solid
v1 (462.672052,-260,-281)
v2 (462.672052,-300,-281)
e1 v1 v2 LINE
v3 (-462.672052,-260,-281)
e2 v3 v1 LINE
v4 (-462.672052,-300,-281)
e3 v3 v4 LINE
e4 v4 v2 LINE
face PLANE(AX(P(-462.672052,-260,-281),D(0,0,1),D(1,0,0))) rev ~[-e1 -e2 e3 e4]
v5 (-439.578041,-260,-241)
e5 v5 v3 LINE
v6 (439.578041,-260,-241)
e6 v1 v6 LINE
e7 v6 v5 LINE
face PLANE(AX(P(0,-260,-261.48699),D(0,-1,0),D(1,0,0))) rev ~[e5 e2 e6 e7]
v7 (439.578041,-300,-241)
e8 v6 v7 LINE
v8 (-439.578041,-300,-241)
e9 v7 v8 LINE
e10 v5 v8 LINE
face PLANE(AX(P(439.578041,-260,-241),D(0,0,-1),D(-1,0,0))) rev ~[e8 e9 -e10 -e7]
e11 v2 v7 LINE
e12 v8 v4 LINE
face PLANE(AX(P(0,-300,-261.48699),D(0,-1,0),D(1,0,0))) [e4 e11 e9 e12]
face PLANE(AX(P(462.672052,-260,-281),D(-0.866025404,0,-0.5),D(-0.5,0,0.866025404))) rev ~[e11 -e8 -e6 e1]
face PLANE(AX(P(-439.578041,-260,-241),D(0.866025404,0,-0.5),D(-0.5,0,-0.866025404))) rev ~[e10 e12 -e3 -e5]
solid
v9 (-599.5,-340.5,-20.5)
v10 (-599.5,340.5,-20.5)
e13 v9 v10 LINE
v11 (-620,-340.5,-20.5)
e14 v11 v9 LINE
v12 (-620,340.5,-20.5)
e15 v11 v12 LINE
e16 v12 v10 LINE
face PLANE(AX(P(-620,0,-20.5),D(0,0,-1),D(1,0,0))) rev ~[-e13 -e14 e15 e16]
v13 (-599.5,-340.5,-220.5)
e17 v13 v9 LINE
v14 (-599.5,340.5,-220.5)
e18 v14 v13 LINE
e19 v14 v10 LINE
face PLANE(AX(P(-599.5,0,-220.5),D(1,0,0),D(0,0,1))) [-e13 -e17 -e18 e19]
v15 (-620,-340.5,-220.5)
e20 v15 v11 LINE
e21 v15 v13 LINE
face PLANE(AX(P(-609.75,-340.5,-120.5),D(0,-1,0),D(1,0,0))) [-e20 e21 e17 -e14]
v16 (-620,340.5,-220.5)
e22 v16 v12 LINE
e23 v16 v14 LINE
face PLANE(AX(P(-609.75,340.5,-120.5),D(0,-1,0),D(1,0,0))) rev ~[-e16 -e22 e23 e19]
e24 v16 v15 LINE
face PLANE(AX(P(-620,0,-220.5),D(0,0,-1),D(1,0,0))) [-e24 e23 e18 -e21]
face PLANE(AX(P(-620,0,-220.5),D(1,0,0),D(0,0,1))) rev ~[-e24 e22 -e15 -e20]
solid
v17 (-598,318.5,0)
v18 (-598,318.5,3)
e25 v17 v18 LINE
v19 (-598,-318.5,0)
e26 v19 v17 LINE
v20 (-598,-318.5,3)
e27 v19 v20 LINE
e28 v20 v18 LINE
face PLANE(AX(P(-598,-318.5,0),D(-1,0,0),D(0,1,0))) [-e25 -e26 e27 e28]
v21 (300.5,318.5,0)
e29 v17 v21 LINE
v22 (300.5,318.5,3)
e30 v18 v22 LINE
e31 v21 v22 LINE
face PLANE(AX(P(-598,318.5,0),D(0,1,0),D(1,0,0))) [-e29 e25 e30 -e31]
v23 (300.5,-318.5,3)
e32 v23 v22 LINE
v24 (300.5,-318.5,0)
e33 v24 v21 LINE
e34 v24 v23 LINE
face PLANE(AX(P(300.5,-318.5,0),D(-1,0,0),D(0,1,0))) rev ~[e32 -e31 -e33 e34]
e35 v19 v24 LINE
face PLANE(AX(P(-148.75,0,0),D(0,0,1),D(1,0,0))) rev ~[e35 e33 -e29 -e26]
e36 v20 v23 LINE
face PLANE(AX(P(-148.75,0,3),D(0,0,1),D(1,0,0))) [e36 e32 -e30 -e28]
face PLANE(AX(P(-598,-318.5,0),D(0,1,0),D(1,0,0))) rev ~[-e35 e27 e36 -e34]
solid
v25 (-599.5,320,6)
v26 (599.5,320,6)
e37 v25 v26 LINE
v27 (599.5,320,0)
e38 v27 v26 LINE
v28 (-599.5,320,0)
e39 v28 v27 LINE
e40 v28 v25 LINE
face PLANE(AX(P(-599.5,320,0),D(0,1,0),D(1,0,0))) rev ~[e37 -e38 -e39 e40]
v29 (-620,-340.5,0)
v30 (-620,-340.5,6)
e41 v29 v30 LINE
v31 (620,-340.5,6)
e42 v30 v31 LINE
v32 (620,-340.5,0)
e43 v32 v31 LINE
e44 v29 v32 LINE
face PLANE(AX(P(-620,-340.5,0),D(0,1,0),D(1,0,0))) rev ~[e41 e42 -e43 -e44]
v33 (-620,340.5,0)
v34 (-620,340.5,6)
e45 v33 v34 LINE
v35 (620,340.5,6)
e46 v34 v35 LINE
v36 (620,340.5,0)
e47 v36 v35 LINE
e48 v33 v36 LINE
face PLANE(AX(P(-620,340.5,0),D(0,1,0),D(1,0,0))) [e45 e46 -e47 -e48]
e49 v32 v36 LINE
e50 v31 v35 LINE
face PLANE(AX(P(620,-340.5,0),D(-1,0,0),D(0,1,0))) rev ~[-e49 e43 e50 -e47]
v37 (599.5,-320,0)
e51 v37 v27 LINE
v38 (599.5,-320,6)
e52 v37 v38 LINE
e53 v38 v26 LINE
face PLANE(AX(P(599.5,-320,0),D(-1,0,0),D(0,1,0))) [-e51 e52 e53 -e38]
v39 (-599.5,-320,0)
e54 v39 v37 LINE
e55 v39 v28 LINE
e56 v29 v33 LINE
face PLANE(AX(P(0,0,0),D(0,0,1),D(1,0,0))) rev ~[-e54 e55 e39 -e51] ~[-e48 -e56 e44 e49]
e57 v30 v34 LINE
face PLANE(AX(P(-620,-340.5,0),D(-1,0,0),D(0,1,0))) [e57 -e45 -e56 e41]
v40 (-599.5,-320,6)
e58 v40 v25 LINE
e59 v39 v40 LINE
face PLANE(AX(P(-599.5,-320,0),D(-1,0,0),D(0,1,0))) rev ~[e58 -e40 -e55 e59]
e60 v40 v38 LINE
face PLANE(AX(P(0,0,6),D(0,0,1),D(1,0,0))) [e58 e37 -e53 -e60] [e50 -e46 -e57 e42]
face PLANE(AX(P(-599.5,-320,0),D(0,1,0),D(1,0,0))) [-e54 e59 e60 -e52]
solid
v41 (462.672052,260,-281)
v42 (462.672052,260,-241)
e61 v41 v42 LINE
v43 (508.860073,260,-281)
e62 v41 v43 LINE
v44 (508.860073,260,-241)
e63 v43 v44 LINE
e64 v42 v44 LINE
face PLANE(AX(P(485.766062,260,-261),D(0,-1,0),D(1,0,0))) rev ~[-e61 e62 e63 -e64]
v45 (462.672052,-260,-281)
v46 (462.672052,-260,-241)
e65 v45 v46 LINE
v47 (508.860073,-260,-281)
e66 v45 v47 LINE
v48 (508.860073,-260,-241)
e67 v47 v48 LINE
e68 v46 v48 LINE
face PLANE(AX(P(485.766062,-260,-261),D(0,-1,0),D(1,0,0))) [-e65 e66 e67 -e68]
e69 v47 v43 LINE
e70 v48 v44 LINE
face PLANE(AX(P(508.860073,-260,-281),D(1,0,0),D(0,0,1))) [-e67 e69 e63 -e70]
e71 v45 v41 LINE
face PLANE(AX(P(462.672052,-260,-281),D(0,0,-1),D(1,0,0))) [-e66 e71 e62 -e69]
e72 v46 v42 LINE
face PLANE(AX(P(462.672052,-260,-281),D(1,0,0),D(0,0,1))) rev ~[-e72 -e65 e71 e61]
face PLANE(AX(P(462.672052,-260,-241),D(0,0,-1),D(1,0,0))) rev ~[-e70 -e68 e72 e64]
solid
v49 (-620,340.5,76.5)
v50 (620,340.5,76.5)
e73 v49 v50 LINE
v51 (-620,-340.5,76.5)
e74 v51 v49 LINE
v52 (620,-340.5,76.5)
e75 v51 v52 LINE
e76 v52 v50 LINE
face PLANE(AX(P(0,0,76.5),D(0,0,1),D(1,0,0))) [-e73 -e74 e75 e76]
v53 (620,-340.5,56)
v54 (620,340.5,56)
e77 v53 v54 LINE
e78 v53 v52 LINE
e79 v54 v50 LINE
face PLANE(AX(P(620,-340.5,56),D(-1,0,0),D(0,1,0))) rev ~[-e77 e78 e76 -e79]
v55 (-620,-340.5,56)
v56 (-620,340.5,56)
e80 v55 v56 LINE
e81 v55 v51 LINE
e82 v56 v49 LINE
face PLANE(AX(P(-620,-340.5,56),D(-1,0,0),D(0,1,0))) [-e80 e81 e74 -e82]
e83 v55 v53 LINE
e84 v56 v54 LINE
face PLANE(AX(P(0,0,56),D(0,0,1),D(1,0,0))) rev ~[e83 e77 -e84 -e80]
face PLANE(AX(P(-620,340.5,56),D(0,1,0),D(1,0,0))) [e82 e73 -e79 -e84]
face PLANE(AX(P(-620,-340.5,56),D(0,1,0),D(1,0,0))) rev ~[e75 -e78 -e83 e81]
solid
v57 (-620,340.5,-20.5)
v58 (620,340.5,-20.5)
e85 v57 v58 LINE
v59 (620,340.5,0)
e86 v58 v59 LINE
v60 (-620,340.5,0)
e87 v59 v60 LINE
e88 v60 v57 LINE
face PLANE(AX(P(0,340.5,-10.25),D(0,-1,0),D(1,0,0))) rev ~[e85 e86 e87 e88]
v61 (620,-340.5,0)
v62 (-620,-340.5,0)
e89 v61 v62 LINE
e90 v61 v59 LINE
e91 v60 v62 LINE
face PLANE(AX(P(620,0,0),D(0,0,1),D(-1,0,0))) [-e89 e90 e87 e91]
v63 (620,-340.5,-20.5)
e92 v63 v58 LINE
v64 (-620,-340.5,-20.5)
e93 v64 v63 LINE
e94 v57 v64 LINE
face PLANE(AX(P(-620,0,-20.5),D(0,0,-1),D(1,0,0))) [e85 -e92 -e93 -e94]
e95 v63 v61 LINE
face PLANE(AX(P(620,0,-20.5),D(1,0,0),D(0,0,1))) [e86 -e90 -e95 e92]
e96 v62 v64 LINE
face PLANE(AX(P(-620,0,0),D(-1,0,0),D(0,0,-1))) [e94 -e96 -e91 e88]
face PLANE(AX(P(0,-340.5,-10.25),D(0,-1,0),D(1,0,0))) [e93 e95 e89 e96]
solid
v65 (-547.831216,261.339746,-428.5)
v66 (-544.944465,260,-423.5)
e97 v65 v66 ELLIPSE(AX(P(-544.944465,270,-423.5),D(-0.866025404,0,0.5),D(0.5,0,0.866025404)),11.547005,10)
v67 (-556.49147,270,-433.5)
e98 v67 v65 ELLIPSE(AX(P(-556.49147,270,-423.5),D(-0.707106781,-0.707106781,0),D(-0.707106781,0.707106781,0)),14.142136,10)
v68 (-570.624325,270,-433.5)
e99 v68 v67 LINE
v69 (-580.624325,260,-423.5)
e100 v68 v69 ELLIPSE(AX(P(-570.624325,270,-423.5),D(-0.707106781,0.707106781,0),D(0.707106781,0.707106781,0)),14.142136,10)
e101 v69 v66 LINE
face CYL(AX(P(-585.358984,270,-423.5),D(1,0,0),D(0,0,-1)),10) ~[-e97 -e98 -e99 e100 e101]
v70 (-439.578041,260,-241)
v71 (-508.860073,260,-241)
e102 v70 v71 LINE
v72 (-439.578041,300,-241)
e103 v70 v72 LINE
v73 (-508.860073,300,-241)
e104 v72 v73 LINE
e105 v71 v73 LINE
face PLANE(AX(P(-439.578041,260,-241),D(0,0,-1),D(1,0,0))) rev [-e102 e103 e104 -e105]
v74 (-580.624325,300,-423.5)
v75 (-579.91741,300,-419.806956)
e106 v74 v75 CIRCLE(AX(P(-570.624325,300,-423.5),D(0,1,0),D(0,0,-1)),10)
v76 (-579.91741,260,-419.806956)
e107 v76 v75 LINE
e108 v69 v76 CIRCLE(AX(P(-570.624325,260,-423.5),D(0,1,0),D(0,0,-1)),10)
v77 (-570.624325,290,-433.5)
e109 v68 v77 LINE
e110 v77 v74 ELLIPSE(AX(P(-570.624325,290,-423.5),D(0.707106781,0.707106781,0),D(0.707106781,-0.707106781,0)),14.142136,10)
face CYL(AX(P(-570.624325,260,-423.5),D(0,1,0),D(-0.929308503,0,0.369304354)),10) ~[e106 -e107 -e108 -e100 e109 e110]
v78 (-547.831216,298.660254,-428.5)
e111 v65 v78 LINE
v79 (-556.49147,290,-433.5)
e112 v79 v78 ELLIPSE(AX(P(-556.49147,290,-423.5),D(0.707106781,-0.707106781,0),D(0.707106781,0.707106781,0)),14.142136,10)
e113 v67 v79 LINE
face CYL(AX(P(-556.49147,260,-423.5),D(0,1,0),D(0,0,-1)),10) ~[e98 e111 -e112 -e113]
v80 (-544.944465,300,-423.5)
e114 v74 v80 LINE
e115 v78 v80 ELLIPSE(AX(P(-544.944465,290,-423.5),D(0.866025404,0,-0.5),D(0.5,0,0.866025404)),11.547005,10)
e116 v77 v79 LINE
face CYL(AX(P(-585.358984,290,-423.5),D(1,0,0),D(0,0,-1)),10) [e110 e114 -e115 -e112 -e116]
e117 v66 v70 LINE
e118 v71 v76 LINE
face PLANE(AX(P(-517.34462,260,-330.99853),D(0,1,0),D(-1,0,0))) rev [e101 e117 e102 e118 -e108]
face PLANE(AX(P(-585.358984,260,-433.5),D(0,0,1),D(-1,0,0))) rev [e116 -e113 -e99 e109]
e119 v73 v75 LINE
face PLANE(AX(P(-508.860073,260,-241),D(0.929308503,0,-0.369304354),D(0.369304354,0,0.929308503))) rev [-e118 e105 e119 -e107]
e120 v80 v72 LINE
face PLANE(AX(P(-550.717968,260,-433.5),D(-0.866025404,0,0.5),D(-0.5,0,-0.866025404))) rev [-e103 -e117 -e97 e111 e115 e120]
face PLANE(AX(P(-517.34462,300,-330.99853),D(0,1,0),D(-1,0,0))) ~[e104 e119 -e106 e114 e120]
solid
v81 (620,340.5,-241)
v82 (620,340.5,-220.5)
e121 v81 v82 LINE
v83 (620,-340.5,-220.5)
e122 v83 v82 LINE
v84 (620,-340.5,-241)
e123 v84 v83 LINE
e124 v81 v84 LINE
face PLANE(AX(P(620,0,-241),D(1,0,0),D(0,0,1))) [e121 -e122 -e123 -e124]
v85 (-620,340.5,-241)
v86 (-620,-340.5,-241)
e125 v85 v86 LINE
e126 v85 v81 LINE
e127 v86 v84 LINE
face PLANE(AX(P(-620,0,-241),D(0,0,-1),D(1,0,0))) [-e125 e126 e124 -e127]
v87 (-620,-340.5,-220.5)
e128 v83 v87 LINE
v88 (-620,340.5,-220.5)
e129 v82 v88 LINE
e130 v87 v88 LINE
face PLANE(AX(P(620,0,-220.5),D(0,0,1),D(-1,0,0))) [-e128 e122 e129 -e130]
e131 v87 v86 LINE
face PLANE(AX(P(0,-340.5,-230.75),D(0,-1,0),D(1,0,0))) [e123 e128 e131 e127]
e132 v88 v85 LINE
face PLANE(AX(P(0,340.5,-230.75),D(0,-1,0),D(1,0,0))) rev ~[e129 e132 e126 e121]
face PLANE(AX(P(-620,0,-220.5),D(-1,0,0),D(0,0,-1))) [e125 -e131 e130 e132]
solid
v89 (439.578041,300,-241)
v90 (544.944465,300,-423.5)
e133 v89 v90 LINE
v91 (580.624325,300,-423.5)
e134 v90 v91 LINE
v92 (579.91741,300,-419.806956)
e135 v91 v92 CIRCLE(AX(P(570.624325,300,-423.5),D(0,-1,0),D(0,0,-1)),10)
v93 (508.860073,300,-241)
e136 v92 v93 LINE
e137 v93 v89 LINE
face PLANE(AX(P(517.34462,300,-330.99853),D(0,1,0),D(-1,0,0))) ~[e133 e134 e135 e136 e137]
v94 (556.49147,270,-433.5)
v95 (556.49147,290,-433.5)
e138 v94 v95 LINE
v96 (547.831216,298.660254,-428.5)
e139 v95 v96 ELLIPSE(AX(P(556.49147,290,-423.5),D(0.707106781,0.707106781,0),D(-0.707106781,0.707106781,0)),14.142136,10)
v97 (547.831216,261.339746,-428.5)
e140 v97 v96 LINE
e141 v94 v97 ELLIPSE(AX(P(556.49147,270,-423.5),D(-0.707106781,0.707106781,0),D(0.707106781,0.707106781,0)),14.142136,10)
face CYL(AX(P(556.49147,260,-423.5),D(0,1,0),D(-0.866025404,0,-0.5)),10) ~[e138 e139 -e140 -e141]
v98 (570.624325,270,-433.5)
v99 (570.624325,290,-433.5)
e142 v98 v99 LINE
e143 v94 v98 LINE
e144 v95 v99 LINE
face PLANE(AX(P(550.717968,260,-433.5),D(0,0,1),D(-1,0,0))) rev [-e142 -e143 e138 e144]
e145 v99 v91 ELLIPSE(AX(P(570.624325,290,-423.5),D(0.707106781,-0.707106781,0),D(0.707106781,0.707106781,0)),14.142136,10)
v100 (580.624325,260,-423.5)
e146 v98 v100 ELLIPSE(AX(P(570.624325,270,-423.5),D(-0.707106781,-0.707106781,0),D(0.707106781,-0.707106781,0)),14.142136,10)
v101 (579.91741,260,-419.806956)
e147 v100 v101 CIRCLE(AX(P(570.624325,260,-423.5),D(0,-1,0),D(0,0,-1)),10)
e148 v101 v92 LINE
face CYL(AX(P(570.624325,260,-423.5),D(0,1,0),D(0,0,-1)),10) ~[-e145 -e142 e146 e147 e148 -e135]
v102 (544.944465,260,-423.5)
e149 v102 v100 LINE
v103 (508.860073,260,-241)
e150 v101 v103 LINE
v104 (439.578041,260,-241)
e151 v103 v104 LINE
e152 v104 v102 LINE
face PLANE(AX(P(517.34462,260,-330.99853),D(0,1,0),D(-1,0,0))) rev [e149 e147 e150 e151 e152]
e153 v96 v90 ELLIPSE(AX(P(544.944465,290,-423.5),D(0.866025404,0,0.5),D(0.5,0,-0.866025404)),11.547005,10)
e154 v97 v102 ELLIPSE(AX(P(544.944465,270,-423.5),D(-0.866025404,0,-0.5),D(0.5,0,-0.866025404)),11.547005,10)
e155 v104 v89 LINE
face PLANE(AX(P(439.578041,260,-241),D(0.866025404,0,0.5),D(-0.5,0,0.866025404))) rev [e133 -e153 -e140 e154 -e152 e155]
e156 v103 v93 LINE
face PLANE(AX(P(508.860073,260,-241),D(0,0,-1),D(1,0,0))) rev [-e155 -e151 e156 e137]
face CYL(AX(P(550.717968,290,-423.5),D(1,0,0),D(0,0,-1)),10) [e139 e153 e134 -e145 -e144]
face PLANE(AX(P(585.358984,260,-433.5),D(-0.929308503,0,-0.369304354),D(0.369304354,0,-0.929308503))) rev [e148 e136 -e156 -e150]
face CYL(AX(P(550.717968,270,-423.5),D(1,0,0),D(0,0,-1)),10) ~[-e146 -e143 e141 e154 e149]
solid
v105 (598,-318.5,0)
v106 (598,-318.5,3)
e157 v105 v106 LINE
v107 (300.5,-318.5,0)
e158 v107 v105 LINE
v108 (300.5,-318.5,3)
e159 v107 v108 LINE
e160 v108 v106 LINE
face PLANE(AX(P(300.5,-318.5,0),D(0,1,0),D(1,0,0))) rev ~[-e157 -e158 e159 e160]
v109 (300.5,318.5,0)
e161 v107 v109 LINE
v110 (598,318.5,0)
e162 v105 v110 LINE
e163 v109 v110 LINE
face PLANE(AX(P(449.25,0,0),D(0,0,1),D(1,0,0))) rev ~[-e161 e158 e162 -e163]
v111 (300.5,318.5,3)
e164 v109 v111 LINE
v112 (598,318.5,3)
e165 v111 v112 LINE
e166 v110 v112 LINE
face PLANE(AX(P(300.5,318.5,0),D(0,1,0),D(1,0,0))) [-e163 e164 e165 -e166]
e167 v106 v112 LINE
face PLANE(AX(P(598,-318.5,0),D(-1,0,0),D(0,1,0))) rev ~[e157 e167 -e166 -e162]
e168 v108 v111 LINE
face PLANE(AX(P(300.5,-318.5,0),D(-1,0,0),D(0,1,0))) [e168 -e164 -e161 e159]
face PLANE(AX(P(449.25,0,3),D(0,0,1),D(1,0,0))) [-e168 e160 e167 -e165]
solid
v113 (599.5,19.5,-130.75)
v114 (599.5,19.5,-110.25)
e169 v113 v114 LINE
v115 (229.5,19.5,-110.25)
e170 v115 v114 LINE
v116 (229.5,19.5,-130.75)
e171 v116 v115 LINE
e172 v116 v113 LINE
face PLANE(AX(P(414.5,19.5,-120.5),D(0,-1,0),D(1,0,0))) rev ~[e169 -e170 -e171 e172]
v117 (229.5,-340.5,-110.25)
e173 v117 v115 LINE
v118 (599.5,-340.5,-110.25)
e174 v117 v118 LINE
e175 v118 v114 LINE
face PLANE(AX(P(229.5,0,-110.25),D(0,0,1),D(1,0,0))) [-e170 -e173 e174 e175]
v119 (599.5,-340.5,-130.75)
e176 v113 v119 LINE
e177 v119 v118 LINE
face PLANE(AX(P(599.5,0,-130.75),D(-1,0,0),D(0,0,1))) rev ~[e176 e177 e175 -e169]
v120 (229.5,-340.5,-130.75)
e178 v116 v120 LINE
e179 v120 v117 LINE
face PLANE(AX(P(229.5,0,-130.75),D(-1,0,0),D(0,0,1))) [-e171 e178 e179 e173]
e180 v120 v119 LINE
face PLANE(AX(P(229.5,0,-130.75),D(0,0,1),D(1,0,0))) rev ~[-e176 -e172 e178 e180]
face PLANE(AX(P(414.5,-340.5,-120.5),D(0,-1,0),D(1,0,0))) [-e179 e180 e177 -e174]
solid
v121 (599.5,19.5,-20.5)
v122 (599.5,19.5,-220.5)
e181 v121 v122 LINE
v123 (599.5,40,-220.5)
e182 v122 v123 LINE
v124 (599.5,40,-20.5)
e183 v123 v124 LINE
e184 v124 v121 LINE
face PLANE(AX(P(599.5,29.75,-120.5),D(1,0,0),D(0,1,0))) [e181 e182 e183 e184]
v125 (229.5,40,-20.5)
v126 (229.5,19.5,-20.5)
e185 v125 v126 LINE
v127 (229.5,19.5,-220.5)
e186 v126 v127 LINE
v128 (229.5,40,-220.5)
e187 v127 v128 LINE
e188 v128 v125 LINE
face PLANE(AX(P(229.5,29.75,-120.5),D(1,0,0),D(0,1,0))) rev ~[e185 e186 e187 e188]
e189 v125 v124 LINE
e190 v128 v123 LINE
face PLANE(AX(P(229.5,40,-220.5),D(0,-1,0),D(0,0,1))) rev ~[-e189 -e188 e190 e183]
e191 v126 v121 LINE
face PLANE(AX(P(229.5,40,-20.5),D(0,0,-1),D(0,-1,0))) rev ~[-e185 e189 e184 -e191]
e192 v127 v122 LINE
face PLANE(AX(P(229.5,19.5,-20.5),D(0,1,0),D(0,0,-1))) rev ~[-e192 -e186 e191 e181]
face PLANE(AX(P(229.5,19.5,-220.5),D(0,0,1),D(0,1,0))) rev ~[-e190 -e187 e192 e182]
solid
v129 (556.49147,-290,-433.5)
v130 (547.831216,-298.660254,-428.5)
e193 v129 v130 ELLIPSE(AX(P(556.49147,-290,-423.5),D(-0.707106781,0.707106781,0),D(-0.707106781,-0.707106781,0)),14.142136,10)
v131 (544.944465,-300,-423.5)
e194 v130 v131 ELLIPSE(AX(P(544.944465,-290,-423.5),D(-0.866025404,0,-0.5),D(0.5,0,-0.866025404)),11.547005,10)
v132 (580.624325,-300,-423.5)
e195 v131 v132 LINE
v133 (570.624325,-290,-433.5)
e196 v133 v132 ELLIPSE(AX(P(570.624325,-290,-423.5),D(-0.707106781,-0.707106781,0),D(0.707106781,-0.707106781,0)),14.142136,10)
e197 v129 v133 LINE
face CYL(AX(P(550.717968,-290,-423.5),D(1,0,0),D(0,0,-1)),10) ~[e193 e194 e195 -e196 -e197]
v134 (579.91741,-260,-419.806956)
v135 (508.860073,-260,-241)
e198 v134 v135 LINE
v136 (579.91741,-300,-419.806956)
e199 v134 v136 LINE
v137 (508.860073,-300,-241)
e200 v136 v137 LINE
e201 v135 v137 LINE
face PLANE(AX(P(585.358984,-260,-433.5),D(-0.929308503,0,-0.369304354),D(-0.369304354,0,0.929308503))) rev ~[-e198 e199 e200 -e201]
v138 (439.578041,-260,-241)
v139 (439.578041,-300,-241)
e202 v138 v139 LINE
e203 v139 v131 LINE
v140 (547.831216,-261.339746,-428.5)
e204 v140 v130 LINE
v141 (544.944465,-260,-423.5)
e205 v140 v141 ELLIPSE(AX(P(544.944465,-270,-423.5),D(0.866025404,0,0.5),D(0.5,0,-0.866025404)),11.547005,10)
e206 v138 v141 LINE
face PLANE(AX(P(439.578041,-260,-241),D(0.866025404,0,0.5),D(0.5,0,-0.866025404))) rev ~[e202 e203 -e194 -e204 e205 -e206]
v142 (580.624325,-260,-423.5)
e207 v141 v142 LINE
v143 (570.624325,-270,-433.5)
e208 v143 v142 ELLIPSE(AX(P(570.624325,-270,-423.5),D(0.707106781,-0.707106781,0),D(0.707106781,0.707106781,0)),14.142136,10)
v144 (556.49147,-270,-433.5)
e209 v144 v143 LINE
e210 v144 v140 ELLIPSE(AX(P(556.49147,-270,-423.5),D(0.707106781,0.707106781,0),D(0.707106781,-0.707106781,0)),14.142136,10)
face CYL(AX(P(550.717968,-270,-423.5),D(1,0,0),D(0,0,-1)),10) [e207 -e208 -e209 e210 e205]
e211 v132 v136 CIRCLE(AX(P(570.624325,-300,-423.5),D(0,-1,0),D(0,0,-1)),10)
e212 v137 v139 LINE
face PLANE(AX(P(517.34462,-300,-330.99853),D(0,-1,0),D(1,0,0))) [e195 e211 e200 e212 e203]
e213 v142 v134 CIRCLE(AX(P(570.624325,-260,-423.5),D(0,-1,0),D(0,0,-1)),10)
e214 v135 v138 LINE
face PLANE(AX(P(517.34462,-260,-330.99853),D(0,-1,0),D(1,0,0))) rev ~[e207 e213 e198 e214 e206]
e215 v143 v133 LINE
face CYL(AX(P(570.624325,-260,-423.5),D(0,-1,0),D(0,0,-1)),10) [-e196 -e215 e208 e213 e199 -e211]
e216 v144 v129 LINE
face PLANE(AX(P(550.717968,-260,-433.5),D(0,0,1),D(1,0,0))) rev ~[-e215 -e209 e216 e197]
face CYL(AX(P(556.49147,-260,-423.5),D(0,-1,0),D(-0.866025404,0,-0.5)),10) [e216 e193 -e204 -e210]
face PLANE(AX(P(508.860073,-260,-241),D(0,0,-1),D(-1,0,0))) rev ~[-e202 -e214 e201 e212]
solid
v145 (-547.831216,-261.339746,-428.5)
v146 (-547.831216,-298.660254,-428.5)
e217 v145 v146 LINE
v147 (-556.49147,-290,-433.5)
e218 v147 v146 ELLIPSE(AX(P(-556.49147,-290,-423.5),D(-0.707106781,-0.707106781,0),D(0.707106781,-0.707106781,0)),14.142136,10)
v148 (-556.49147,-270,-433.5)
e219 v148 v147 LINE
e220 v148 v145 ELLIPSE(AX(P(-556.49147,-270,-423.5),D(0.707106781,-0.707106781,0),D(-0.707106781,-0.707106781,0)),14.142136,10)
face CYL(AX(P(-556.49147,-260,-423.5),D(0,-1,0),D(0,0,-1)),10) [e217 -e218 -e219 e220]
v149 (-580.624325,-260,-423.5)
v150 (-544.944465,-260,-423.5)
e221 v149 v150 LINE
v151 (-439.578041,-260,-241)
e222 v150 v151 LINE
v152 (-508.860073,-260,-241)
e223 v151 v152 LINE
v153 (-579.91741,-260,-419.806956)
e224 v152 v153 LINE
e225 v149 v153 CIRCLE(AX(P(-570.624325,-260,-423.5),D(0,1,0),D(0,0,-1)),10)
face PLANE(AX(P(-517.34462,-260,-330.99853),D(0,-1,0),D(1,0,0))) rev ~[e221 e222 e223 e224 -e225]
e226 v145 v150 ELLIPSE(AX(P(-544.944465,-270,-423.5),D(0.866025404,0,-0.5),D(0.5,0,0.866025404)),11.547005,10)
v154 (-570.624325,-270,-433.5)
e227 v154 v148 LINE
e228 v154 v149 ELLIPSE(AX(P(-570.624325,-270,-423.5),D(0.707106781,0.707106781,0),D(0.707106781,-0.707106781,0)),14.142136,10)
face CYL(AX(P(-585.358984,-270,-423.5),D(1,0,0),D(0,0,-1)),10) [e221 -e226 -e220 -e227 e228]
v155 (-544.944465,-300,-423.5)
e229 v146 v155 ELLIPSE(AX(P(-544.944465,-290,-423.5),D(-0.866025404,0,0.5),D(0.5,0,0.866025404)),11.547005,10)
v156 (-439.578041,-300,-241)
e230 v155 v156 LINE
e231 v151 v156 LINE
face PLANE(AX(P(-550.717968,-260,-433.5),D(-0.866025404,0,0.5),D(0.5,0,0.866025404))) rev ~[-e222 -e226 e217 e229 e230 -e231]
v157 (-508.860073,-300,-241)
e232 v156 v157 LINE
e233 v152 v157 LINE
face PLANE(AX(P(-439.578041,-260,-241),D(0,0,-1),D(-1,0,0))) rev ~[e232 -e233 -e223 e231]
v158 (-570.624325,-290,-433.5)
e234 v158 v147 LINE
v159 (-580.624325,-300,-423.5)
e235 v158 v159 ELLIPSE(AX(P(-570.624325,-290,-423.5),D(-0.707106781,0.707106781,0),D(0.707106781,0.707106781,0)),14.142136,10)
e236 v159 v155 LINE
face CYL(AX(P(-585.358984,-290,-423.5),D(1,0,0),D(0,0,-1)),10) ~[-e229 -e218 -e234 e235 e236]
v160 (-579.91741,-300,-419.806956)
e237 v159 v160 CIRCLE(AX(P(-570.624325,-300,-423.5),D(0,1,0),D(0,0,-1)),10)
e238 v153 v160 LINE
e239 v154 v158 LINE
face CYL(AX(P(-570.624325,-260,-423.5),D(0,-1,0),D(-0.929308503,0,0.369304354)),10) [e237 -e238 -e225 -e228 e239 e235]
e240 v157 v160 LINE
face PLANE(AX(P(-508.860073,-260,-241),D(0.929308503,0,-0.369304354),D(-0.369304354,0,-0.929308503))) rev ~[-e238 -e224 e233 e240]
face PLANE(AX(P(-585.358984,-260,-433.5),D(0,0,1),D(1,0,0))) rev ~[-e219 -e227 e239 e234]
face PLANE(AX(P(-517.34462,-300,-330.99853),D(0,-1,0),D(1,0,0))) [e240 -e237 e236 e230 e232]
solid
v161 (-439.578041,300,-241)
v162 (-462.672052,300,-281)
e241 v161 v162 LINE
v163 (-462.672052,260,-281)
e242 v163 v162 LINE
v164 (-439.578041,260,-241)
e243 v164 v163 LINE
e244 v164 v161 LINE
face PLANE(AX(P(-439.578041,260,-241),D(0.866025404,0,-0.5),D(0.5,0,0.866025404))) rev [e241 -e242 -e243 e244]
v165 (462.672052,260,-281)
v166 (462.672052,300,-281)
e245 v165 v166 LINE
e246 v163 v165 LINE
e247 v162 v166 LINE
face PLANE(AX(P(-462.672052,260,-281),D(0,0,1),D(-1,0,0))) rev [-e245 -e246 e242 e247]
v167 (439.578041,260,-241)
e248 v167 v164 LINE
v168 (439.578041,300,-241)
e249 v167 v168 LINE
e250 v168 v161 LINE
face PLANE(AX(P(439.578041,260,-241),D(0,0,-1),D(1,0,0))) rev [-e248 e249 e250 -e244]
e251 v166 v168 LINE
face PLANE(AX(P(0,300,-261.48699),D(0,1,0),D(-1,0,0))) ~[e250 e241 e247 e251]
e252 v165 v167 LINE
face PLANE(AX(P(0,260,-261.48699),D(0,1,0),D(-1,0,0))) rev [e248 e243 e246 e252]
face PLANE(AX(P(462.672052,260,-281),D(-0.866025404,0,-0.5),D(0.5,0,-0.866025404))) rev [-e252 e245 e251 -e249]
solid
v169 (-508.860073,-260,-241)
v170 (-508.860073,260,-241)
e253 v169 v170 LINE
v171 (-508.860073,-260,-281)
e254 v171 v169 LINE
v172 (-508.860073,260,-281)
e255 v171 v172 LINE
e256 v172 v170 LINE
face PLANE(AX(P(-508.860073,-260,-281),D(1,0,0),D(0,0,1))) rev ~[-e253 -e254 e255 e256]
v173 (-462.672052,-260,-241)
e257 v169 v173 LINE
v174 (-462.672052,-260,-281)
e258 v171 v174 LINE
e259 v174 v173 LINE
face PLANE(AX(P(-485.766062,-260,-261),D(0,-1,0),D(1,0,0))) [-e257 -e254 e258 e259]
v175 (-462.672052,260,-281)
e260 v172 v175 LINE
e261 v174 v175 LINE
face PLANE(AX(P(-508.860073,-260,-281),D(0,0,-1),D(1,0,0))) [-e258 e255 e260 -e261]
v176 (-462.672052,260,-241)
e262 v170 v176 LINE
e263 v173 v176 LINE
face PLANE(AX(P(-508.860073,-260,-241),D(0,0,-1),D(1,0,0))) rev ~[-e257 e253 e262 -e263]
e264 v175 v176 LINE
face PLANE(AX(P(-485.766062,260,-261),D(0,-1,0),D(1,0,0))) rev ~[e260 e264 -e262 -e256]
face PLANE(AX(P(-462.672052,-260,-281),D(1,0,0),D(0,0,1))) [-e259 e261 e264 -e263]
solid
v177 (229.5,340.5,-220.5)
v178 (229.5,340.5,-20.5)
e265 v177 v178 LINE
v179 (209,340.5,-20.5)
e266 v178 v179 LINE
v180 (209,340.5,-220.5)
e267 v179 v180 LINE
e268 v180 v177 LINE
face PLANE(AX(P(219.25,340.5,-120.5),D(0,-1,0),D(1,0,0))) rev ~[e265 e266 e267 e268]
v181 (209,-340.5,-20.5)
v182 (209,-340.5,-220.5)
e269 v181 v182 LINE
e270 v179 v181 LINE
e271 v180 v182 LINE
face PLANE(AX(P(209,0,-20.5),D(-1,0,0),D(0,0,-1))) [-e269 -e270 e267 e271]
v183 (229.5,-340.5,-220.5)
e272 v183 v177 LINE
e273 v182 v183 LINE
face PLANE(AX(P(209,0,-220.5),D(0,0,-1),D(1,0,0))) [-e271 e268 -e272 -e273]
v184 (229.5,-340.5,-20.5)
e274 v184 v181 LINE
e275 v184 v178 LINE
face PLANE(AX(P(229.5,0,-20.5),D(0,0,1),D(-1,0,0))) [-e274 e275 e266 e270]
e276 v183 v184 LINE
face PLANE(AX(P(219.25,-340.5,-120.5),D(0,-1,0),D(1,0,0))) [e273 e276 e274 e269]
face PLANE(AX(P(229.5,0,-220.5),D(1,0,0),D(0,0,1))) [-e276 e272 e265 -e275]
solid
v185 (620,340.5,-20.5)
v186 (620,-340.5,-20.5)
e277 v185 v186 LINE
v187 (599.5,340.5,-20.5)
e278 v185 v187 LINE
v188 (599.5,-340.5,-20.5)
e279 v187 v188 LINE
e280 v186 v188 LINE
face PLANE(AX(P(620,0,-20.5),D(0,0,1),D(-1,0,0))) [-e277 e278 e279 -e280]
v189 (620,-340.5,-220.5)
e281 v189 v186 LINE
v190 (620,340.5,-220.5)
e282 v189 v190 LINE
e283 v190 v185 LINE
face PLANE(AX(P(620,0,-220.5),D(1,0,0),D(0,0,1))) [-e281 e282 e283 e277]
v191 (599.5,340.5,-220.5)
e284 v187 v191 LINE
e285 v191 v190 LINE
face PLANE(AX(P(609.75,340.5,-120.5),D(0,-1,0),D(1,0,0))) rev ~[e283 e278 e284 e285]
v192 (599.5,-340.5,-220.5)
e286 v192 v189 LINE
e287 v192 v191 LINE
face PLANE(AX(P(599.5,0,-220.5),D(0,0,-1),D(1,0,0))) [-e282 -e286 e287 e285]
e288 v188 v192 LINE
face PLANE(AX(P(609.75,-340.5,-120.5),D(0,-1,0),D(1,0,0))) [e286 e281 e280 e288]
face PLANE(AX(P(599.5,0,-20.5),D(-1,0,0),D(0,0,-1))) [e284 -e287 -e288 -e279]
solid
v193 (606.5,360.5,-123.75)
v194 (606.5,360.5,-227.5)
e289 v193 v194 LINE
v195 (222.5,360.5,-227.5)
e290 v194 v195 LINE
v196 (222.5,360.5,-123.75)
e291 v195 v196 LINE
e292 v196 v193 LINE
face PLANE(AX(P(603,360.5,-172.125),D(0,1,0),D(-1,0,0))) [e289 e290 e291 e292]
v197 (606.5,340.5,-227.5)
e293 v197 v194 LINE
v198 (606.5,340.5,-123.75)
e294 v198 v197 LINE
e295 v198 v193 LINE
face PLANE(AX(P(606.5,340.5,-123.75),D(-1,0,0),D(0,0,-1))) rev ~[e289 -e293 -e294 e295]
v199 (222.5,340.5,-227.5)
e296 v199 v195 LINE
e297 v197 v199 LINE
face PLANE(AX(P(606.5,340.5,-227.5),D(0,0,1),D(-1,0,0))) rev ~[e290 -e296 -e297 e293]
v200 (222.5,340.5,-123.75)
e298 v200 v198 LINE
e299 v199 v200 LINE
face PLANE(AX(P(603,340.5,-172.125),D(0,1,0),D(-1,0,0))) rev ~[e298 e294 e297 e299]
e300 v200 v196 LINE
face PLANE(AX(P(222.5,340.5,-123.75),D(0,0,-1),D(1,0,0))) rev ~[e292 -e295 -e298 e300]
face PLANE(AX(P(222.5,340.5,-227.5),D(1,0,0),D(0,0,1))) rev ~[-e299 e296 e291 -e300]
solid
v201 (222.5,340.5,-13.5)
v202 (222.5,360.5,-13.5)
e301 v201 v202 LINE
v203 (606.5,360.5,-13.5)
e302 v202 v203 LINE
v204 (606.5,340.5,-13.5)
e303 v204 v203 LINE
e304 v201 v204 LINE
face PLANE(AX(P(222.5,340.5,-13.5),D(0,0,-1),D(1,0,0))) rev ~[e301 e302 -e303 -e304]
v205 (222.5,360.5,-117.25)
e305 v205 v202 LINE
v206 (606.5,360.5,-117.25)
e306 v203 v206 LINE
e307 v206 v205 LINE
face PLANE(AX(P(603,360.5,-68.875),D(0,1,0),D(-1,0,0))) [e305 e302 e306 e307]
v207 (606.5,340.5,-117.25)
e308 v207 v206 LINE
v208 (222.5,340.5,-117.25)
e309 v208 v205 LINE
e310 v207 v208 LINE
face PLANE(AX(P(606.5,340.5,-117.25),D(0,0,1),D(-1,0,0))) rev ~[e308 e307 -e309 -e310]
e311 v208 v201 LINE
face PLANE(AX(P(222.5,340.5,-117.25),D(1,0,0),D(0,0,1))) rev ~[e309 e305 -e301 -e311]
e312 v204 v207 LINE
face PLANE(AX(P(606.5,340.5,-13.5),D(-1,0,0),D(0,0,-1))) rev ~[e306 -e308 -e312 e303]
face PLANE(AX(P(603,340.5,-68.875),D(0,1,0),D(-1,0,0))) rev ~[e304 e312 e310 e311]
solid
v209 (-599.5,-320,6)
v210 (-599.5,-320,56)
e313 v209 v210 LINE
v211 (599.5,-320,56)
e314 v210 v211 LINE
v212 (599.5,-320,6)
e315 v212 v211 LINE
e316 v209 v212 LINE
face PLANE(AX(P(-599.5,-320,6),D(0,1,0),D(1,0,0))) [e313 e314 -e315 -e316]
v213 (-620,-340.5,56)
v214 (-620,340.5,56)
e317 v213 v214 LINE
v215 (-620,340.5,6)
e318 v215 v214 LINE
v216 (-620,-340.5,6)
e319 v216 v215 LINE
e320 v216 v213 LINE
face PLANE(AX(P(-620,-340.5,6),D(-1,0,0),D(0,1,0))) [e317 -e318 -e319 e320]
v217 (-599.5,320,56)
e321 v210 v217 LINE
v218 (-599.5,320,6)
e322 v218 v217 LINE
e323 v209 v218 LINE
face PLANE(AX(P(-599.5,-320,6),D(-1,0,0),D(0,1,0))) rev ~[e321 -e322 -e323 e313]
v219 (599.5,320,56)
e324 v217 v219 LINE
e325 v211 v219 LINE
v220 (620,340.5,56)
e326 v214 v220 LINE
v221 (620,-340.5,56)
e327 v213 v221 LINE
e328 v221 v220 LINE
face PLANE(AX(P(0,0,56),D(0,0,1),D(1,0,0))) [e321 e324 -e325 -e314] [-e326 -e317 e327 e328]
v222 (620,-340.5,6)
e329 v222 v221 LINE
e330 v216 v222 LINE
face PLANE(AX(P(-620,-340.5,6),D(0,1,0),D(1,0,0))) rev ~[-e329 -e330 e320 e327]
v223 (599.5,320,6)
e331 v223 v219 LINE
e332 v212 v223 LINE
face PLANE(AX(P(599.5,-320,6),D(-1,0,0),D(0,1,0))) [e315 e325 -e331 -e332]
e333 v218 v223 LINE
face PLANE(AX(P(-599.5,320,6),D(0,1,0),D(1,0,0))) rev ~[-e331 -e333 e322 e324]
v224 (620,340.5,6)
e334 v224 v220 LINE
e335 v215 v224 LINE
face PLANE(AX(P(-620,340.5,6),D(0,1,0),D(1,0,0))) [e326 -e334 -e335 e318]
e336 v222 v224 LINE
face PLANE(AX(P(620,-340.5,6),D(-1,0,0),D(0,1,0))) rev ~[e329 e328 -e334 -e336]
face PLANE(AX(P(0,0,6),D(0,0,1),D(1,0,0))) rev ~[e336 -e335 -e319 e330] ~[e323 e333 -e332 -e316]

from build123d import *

# Parameters (mm, degrees)
F1_DEPTH       = 340.5
F1_DEPTH_BACK  = 340.5
F2_DEPTH       = 340.5
F2_DEPTH_BACK  = 340.5
F0_W           = 20.5
F0_H           = 200
F3_DEPTH       = 340.5
F3_DEPTH_BACK  = 340.5
F6_DEPTH       = 40
F7_R           = 10
F7_2_R         = 10
F8_DEPTH       = 40
F10_W          = 46.1880215352
F10_H          = 40
F11_DEPTH      = 520
F12_W          = 7
F12_H          = 96.75
F13_DEPTH      = 20
F14_W          = 1240
F14_H          = 681
F14_W_2        = 1230
F14_H_2        = 671
F14_W_3        = 1199
F14_H_3        = 640
F15_DEPTH      = 6
F16_W          = 898.5
F16_H          = 637
F17_DEPTH      = 3
F16_W_2        = 297.5
F18_DEPTH      = 3
F19_DEPTH      = 50
F20_W          = 1240
F20_H          = 681
F21_DEPTH      = 20.5
F23_DEPTH      = 370
F0_W_2         = 370
F0_H_2         = 20.5
F24_DEPTH      = 19.5
F24_DEPTH_BACK = 340.5


# Not quite as in the source:
# - a feature names something its author has since deleted; it is built from what else it names


with BuildPart() as f1:
    # F0 (on Front) → F1 (new body, two sides)
    with BuildSketch(Plane.XZ) as f1_sk:
        Polygon((-599.5, -220.5), (-620, -220.5), (-620, -241), (620, -241), (620, -220.5), (599.5, -220.5), (229.5, -220.5), (209, -220.5), align=None)
    extrude(amount=F1_DEPTH)
    extrude(f1_sk.sketch, amount=-F1_DEPTH_BACK)


with BuildPart() as f2:
    # F0 (on Front) → F2 (new body, two sides)
    with BuildSketch(Plane.XZ) as f2_sk:
        Polygon((229.5, -20.5), (209, -20.5), (209, -220.5), (229.5, -220.5), (229.5, -130.75), (229.5, -110.25), align=None)
    extrude(amount=F2_DEPTH)
    extrude(f2_sk.sketch, amount=-F2_DEPTH_BACK)


with BuildPart() as f2b:
    # F0 (on Front) → F2, piece 2 (new body, two sides)
    with BuildSketch(Plane.XZ) as f2_2_sk:
        with Locations((-609.75, -120.5)):
            Rectangle(F0_W, F0_H)
    extrude(amount=F2_DEPTH)
    extrude(f2_2_sk.sketch, amount=-F2_DEPTH_BACK)


with BuildPart() as f2c:
    # F0 (on Front) → F2, piece 3 (new body, two sides)
    with BuildSketch(Plane.XZ) as f2_3_sk:
        Polygon((620, -220.5), (620, -20.5), (599.5, -20.5), (599.5, -110.25), (599.5, -130.75), (599.5, -220.5), align=None)
    extrude(amount=F2_DEPTH)
    extrude(f2_3_sk.sketch, amount=-F2_DEPTH_BACK)


with BuildPart() as f3:
    # F0 (on Front) → F3 (new body, two sides)
    with BuildSketch(Plane.XZ) as f3_sk:
        Polygon((620, 0), (-620, 0), (-620, -20.5), (-599.5, -20.5), (209, -20.5), (229.5, -20.5), (599.5, -20.5), (620, -20.5), align=None)
    extrude(amount=F3_DEPTH)
    extrude(f3_sk.sketch, amount=-F3_DEPTH_BACK)


with BuildPart() as f6:
    # F5 (on offset) → F6 (new body)
    with BuildSketch(Plane.XZ.offset(260)):
        Polygon((-439.5780408782, -241), (-508.860073181, -241), (-585.3589838486, -433.5), (-550.7179676972, -433.5), (-462.6720516458, -281), align=None)
    extrude(amount=F6_DEPTH)

    # F7
    f7_edges = [f6.edges().sort_by_distance(p)[0] for p in [
        (-568.038476, -300, -433.5),
        (-550.717968, -280, -433.5),
        (-568.038476, -260, -433.5),
        (-585.358984, -280, -433.5),
    ]]
    fillet(f7_edges, radius=F7_R)


with BuildPart() as f6b:
    # F5 (on offset) → F6, piece 2 (new body)
    with BuildSketch(Plane.XZ.offset(260)):
        Polygon((508.860073181, -241), (439.5780408782, -241), (462.6720516458, -281), (550.7179676972, -433.5), (585.3589838486, -433.5), align=None)
    extrude(amount=F6_DEPTH)

    # F7#2
    f7_2_edges = [f6b.edges().sort_by_distance(p)[0] for p in [
        (568.038476, -300, -433.5),
        (550.717968, -280, -433.5),
        (568.038476, -260, -433.5),
        (585.358984, -280, -433.5),
    ]]
    fillet(f7_2_edges, radius=F7_2_R)


with BuildPart() as f8:
    # F5 (on offset) → F8 (new body)
    with BuildSketch(Plane.XZ.offset(260)):
        Polygon((439.5780408782, -241), (-439.5780408782, -241), (-462.6720516458, -281), (462.6720516458, -281), align=None)
    extrude(amount=F8_DEPTH)


with BuildPart() as f9_1:
    # F9: instance of F6
    add(f6.part.mirror(Plane.XZ))


with BuildPart() as f9_2:
    # F9: instance of F6b
    add(f6b.part.mirror(Plane.XZ))


with BuildPart() as f9_3:
    # F9: instance of F8
    add(f8.part.mirror(Plane.XZ))


with BuildPart() as f11:
    # F10 (on face) → F11 (new body, through all)
    with BuildSketch(Plane.XZ.offset(260)):
        with Locations((485.7660624134, -261)):
            Rectangle(F10_W, F10_H)
    extrude(amount=-F11_DEPTH)


with BuildPart() as f11b:
    # F10 (on face) → F11, piece 2 (new body, through all)
    with BuildSketch(Plane.XZ.offset(260)):
        with Locations((-485.7660624134, -261)):
            Rectangle(F10_W, F10_H)
    extrude(amount=-F11_DEPTH)


with BuildPart() as f13:
    # F12 (on face) → F13 (new body)
    with BuildSketch(Plane(origin=(0, 340.5, 0), x_dir=(-1, 0, 0), z_dir=(0, 1, 0))):
        with Locations((-603, -68.875)):
            Rectangle(F12_W, F12_H)
        Polygon((-222.5, -117.25), (-222.5, -13.5), (-606.5, -13.5), (-606.5, -20.5), (-599.5, -20.5), (-599.5, -117.25), align=None)
    extrude(amount=F13_DEPTH)


with BuildPart() as f13b:
    # F12 (on face) → F13, piece 2 (new body)
    with BuildSketch(Plane(origin=(0, 340.5, 0), x_dir=(-1, 0, 0), z_dir=(0, 1, 0))):
        with Locations((-603, -172.125)):
            Rectangle(F12_W, F12_H)
        Polygon((-222.5, -123.75), (-599.5, -123.75), (-599.5, -220.5), (-606.5, -220.5), (-606.5, -227.5), (-222.5, -227.5), align=None)
    extrude(amount=F13_DEPTH)


with BuildPart() as f15:
    # F14 (on face) → F15 (new body)
    with BuildSketch(Plane.XY):
        Rectangle(F14_W, F14_H)
        Rectangle(F14_W_2, F14_H_2, mode=Mode.SUBTRACT)
        Rectangle(F14_W_2, F14_H_2)
        Rectangle(F14_W_3, F14_H_3, mode=Mode.SUBTRACT)
    extrude(amount=F15_DEPTH)


with BuildPart() as f17:
    # F16 (on face) → F17 (new body)
    with BuildSketch(Plane.XY):
        with Locations((-148.75, 0)):
            Rectangle(F16_W, F16_H)
    extrude(amount=F17_DEPTH)


with BuildPart() as f18:
    # F16 (on face) → F18 (new body, through all)
    with BuildSketch(Plane.XY):
        with Locations((449.25, 0)):
            Rectangle(F16_W_2, F16_H)
    extrude(amount=F18_DEPTH)


with BuildPart() as f19:
    # F19 (new): a face of the model
    f19_faces = [f15.part.faces().sort_by_distance(p)[0] for p in [
        (-613.646946667, 0, 6),
    ]]
    extrude(f19_faces, amount=F19_DEPTH)


with BuildPart() as f21:
    # F20 (on face) → F21 (new body)
    with BuildSketch(Plane.XY.offset(56)):
        Rectangle(F20_W, F20_H)
    extrude(amount=F21_DEPTH)


with BuildPart() as f23:
    # F22 (on face) → F23 (new body, through all)
    with BuildSketch(Plane.YZ.offset(229.5)):
        Polygon((40, -20.5), (19.5, -20.5), (19.5, -130.75), (19.5, -220.5), (40, -220.5), (40, -130.75), align=None)
    extrude(amount=F23_DEPTH)


with BuildPart() as f24:
    # F0 (on Front) → F24 (new body, two sides)
    with BuildSketch(Plane.XZ) as f24_sk:
        with Locations((414.5, -120.5)):
            Rectangle(F0_W_2, F0_H_2)
    extrude(amount=-F24_DEPTH)
    extrude(f24_sk.sketch, amount=F24_DEPTH_BACK)


solid = Compound([f1.part, f2.part, f2b.part, f2c.part, f3.part, f6.part, f6b.part, f8.part, f9_1.part, f9_2.part, f9_3.part, f11.part, f11b.part, f13.part, f13b.part, f15.part, f17.part, f18.part, f19.part, f21.part, f23.part, f24.part])
